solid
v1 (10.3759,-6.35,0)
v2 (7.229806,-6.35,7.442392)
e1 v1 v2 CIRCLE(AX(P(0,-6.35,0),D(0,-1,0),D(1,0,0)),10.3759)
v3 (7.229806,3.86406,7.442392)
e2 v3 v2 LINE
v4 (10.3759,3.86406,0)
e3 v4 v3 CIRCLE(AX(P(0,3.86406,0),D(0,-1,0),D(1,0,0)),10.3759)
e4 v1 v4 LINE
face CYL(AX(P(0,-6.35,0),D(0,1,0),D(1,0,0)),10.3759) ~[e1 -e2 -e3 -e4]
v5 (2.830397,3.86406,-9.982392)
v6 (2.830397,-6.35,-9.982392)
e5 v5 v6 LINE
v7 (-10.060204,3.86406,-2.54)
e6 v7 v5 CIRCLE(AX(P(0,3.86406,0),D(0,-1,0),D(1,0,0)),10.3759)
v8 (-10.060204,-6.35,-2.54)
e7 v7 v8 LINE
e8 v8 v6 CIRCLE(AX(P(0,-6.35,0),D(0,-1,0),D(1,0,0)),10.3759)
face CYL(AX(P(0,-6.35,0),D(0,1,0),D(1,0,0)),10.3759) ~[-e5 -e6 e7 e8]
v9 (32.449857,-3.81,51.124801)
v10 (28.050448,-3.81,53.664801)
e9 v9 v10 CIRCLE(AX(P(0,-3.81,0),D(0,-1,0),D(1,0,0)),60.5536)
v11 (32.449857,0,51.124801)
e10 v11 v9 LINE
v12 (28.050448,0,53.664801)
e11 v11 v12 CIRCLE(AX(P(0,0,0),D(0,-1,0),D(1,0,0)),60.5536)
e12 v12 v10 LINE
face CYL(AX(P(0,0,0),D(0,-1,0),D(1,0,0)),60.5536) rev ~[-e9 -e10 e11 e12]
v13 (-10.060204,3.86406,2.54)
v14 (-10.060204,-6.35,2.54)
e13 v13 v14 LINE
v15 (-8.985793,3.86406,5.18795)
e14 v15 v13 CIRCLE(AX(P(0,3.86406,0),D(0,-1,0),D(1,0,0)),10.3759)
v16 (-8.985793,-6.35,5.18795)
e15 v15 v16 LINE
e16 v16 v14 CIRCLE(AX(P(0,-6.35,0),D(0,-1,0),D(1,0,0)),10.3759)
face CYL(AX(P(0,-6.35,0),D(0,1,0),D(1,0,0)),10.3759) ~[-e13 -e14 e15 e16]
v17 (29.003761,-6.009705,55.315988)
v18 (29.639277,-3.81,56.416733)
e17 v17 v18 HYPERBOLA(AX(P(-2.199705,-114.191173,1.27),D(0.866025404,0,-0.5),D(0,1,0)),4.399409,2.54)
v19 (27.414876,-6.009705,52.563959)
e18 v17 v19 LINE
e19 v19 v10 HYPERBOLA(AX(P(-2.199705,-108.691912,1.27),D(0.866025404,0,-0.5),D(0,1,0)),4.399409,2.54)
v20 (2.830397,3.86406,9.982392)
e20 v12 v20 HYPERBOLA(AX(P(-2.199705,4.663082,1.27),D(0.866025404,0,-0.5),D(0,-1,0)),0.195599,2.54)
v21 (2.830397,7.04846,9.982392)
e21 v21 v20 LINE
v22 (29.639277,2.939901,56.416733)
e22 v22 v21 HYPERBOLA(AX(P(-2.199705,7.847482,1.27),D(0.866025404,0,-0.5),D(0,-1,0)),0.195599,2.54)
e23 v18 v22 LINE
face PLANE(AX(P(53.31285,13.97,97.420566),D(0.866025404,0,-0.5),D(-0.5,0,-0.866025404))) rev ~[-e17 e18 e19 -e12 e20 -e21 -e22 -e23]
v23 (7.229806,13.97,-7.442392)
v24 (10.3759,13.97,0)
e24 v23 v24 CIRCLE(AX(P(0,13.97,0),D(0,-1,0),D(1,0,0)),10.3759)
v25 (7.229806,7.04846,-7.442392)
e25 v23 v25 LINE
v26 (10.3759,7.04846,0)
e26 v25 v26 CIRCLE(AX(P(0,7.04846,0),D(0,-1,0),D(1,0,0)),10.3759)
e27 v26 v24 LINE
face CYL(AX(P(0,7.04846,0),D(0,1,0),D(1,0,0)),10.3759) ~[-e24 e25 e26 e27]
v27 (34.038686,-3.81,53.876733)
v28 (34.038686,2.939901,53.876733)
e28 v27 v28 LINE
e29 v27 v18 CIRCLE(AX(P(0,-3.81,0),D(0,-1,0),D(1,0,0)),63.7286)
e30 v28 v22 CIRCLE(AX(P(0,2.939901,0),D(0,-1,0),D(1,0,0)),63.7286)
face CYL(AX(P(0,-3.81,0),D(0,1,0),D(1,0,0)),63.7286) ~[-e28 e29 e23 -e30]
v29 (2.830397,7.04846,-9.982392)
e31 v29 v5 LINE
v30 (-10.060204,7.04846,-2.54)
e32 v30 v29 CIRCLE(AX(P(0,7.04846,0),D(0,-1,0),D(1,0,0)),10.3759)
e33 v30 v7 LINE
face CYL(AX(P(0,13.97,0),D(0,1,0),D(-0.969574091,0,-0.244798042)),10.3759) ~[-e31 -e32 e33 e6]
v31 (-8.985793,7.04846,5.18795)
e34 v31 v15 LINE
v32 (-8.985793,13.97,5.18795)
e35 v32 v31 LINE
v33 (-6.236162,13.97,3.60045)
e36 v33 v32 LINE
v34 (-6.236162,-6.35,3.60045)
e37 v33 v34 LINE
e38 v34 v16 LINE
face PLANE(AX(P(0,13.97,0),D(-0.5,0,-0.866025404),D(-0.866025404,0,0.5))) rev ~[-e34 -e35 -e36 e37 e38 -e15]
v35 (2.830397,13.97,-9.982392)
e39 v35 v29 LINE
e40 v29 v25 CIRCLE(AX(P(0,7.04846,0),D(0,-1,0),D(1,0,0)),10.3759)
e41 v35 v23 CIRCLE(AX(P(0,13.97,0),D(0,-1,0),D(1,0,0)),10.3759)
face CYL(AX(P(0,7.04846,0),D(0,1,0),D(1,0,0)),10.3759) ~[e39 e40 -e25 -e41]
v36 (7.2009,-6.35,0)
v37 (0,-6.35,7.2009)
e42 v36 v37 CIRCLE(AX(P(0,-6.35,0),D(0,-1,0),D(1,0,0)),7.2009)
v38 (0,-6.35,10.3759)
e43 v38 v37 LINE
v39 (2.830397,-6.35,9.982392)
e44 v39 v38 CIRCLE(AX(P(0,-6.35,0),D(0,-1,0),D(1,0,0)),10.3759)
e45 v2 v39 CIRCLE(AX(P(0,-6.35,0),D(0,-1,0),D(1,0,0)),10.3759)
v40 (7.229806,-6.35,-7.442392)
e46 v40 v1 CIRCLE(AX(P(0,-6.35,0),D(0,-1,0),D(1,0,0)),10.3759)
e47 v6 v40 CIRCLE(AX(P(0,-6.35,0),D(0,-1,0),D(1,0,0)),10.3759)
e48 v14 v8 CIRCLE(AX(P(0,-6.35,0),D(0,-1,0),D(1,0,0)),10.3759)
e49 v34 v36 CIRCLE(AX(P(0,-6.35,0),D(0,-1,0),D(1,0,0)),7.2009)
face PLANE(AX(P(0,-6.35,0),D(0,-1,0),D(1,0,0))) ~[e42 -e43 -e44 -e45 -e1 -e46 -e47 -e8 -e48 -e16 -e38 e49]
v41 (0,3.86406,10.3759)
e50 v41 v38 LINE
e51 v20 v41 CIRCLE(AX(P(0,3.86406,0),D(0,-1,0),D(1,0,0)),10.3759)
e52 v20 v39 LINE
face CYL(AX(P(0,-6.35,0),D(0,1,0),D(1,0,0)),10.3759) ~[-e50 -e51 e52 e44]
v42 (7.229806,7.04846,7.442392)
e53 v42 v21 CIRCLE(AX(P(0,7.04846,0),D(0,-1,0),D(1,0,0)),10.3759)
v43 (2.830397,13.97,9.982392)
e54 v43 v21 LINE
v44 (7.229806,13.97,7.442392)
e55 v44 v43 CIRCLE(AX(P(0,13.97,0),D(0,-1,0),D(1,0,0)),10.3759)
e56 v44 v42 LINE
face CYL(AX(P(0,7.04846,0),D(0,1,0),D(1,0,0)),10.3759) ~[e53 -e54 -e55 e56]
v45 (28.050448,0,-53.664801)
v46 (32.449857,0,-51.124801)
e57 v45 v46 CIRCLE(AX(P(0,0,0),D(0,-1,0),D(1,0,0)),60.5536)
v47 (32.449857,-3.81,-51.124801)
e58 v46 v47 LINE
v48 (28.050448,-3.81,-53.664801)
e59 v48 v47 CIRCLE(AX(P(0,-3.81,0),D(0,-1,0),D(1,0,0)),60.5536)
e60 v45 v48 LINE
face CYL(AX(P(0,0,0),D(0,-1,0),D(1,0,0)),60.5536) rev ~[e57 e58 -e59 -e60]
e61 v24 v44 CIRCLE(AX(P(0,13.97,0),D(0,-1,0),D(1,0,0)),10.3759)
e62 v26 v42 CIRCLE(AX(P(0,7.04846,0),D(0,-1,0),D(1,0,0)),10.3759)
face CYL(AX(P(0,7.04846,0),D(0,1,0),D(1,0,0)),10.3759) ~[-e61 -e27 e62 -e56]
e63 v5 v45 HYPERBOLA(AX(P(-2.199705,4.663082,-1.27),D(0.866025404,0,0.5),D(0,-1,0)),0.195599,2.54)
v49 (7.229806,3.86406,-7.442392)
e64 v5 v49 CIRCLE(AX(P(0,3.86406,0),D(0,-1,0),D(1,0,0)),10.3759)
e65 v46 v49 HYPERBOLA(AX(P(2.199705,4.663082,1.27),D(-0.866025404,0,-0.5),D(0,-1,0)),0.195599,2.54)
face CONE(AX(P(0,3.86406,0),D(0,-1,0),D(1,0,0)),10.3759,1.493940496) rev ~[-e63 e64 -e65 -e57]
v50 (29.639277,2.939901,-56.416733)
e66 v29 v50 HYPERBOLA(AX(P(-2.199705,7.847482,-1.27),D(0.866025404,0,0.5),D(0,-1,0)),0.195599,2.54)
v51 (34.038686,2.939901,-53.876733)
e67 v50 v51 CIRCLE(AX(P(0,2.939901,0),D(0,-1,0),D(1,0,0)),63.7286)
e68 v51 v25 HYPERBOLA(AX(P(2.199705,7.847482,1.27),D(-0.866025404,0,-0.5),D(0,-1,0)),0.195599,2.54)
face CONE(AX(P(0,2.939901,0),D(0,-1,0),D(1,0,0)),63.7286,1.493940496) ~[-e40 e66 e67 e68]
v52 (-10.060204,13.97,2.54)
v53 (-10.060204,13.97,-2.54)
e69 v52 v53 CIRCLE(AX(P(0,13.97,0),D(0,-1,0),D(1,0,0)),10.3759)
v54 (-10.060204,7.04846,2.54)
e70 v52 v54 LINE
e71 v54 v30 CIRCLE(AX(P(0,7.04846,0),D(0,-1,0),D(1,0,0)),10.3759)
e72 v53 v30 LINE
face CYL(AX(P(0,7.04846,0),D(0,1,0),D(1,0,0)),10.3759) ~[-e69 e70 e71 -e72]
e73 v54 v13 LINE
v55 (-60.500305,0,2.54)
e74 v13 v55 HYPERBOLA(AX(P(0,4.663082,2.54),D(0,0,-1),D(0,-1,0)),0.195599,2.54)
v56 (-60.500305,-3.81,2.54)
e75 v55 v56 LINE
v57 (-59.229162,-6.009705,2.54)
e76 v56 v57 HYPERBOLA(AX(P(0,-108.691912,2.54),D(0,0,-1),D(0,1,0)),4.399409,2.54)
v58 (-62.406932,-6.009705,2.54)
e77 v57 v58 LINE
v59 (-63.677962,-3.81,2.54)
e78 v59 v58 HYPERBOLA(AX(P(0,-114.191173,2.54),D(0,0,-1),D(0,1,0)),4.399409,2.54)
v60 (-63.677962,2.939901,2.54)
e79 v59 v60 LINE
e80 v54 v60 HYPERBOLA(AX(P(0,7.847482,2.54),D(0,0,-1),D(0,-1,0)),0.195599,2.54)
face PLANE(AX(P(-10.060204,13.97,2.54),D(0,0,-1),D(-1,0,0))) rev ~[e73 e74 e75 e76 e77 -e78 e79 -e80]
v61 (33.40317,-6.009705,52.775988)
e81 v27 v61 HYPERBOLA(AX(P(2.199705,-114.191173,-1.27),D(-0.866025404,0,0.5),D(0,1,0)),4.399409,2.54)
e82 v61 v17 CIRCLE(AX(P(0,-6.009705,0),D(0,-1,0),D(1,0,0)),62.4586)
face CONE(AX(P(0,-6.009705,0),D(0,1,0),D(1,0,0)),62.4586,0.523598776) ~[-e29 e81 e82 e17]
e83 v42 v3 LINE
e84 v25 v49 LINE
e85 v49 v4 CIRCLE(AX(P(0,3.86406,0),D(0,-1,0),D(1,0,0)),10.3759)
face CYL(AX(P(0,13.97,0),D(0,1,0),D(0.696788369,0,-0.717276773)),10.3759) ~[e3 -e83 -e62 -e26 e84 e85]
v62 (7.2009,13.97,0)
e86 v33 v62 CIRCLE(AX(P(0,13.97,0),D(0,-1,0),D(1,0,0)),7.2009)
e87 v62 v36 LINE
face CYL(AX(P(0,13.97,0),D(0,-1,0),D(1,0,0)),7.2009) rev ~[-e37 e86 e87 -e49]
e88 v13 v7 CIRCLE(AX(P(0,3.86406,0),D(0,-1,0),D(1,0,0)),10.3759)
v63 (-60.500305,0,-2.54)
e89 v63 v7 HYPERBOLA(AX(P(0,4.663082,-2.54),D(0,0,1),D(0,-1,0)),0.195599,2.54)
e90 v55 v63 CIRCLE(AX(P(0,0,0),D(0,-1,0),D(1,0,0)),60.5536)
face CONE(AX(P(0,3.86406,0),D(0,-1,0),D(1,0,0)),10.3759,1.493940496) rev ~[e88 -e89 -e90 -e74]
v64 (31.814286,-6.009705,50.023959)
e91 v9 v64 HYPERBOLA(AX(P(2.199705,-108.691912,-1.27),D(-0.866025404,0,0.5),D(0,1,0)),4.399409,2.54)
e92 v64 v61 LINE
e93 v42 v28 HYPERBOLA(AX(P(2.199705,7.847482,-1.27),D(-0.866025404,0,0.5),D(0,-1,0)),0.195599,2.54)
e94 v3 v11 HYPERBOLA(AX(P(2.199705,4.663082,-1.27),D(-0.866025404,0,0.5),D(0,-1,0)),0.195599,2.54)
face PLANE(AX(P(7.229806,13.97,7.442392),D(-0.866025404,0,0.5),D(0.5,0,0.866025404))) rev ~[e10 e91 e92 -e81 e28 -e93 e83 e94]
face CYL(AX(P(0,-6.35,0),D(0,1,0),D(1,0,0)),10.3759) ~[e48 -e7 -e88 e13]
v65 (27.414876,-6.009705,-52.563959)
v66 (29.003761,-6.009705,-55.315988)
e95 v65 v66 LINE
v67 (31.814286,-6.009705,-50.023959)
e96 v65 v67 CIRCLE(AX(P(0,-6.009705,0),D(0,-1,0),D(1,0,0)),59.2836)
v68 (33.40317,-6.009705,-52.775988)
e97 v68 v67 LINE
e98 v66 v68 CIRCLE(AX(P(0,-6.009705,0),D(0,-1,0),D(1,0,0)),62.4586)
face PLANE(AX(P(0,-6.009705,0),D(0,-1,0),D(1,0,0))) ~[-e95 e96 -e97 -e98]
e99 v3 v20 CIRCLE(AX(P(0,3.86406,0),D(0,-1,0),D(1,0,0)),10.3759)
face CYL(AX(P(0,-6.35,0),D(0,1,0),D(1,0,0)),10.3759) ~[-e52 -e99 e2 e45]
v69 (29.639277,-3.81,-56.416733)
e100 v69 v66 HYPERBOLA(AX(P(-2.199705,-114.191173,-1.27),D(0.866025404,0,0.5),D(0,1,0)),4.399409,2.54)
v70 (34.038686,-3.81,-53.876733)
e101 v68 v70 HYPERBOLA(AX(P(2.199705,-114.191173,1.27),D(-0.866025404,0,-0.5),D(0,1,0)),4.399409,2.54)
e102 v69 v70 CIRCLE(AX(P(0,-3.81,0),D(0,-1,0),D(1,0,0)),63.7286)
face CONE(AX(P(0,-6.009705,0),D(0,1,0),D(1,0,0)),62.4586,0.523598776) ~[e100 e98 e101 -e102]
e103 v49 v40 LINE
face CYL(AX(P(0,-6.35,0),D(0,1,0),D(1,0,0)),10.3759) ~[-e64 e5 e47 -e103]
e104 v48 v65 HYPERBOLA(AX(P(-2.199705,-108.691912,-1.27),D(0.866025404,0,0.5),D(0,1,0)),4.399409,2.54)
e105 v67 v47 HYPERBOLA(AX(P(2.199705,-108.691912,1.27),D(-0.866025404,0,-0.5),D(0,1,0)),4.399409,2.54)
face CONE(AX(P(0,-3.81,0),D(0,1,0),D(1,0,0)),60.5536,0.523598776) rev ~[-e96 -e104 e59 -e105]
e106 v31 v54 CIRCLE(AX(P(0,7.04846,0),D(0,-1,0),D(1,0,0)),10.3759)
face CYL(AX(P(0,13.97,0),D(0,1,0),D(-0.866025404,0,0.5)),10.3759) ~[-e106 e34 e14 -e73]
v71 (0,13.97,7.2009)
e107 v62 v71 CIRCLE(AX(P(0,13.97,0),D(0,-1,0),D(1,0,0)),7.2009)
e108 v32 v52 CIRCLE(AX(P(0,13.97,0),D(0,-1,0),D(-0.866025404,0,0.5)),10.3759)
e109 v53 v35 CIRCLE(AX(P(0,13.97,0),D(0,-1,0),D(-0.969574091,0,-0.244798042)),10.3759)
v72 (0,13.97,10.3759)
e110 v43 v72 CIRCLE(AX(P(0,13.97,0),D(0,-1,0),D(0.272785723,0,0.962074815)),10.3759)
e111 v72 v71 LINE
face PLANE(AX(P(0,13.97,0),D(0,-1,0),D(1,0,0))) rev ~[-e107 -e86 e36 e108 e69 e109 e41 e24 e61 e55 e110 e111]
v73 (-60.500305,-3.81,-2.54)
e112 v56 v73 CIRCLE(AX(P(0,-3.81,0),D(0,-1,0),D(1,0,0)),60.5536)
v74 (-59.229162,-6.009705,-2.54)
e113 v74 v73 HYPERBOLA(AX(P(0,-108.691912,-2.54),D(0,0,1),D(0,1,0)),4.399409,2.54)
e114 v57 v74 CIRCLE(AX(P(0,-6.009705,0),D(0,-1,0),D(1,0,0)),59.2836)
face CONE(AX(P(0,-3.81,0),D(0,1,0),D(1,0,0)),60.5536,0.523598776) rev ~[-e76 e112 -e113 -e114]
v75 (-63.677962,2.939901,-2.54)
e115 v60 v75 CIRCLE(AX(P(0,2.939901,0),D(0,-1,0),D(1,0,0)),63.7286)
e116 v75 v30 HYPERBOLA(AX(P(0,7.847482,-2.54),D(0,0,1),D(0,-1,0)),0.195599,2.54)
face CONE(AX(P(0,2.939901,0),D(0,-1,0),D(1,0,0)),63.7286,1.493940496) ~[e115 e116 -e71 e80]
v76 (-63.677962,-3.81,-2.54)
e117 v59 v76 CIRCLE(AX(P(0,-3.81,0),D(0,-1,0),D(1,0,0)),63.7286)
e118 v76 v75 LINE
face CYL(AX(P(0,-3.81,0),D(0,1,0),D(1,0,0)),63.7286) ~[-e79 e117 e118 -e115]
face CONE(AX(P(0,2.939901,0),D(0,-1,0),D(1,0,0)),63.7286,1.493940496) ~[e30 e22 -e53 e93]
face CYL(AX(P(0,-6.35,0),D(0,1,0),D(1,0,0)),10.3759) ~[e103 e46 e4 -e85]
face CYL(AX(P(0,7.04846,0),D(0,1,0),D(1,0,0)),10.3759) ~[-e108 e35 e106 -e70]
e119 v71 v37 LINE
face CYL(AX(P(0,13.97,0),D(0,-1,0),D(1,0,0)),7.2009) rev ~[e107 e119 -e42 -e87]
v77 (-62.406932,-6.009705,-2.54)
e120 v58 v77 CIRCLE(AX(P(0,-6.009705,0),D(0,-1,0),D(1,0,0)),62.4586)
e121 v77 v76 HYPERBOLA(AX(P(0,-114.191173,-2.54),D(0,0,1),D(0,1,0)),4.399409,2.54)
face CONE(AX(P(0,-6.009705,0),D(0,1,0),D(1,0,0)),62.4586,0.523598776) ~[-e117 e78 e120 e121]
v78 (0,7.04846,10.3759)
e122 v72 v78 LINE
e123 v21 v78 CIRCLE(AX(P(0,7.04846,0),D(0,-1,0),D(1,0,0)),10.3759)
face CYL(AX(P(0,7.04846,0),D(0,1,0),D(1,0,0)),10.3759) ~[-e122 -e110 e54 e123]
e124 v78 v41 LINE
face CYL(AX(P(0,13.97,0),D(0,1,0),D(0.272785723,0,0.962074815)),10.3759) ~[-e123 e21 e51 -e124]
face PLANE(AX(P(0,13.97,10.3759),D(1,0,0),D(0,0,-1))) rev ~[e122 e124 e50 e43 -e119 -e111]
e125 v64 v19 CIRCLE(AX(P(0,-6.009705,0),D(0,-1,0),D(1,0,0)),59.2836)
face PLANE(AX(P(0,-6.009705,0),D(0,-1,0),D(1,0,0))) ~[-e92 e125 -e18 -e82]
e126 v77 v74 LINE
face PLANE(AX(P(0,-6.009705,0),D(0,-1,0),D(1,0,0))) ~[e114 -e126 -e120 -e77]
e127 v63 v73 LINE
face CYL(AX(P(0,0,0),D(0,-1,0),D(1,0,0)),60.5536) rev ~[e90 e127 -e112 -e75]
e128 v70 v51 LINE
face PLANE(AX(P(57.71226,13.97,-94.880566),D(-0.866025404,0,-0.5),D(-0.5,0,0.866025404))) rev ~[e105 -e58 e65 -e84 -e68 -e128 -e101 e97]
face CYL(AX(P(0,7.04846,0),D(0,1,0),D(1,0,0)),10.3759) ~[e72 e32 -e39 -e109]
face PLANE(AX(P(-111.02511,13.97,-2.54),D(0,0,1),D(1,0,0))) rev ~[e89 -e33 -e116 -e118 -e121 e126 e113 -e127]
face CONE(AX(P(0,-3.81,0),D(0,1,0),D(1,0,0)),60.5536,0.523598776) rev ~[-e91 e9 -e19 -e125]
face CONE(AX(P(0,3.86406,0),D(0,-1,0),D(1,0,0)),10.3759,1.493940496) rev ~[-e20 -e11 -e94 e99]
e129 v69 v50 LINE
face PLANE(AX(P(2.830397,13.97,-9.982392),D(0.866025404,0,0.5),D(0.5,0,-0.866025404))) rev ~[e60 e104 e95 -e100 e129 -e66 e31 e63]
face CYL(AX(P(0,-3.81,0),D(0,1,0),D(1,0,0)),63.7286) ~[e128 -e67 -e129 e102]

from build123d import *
from build123d import SkipClean  # not in build123d's __all__

# Parameters (mm, degrees)
F3_DEPTH = 25.4


with BuildPart() as f1:
    # F0 (on Top) → F1 (revolve)
    with BuildSketch(Plane.XY):
        Polygon((63.7286, -3.81), (63.7286, 2.9399013527), (10.3759, 7.0484601322), (10.3759, 13.97), (7.2009, 13.97), (7.2009, -6.35), (10.3759, -6.35), (10.3759, 3.8640599232), (60.5536, 0), (60.5536, -3.81), (59.2836, -6.0097045256), (62.4586, -6.0097045256), align=None)
    revolve(axis=Axis((0, -13.2026916835, 0), (0, -1, 0)))

    # F2 (on face) → F3 (cut)
    with BuildSketch(Plane(origin=(0, 13.97, 0), x_dir=(-1, 0, 0), z_dir=(0, 1, 0))):
        with BuildLine():
            Line((111.0251099892, -2.54), (10.0602038155, -2.54))
            ThreePointArc((10.0602038155, -2.54), (5.18795, -8.9857929871), (-2.8303973822, -9.9823920715))
            Line((-2.8303973822, -9.9823920715), (-53.312850469, -97.4205657086))
            ThreePointArc((-53.312850469, -97.4205657086), (40.7588842751, -70.5964584242), (111.0251099892, -2.54))
        make_face()
        with BuildLine():
            Line((10.0602038155, 2.54), (111.0251099892, 2.54))
            ThreePointArc((111.0251099892, 2.54), (40.7588842751, 70.5964584242), (-53.312850469, 97.4205657086))
            Line((-53.312850469, 97.4205657086), (-2.8303973822, 9.9823920715))
            ThreePointArc((-2.8303973822, 9.9823920715), (-1.4288105045, 10.2770521723), (0, 10.3759))
            Line((0, 10.3759), (0, 0))
            Line((0, 0), (8.9857929871, 5.18795))
            ThreePointArc((8.9857929871, 5.18795), (9.6145935095, 3.9011398921), (10.0602038155, 2.54))
        make_face()
        with BuildLine():
            Line((-7.2298064334, 7.4423920715), (-57.7122595202, 94.8805657086))
            ThreePointArc((-57.7122595202, 94.8805657086), (-81.5177685501, 0), (-57.7122595202, -94.8805657086))
            Line((-57.7122595202, -94.8805657086), (-7.2298064334, -7.4423920715))
            ThreePointArc((-7.2298064334, -7.4423920715), (-10.3759, 0), (-7.2298064334, 7.4423920715))
        make_face()
    with SkipClean():  # cleaning this boolean's faces spoils the solid; the shape is the same uncleaned
        extrude(amount=-F3_DEPTH, mode=Mode.SUBTRACT)


solid = f1.part
